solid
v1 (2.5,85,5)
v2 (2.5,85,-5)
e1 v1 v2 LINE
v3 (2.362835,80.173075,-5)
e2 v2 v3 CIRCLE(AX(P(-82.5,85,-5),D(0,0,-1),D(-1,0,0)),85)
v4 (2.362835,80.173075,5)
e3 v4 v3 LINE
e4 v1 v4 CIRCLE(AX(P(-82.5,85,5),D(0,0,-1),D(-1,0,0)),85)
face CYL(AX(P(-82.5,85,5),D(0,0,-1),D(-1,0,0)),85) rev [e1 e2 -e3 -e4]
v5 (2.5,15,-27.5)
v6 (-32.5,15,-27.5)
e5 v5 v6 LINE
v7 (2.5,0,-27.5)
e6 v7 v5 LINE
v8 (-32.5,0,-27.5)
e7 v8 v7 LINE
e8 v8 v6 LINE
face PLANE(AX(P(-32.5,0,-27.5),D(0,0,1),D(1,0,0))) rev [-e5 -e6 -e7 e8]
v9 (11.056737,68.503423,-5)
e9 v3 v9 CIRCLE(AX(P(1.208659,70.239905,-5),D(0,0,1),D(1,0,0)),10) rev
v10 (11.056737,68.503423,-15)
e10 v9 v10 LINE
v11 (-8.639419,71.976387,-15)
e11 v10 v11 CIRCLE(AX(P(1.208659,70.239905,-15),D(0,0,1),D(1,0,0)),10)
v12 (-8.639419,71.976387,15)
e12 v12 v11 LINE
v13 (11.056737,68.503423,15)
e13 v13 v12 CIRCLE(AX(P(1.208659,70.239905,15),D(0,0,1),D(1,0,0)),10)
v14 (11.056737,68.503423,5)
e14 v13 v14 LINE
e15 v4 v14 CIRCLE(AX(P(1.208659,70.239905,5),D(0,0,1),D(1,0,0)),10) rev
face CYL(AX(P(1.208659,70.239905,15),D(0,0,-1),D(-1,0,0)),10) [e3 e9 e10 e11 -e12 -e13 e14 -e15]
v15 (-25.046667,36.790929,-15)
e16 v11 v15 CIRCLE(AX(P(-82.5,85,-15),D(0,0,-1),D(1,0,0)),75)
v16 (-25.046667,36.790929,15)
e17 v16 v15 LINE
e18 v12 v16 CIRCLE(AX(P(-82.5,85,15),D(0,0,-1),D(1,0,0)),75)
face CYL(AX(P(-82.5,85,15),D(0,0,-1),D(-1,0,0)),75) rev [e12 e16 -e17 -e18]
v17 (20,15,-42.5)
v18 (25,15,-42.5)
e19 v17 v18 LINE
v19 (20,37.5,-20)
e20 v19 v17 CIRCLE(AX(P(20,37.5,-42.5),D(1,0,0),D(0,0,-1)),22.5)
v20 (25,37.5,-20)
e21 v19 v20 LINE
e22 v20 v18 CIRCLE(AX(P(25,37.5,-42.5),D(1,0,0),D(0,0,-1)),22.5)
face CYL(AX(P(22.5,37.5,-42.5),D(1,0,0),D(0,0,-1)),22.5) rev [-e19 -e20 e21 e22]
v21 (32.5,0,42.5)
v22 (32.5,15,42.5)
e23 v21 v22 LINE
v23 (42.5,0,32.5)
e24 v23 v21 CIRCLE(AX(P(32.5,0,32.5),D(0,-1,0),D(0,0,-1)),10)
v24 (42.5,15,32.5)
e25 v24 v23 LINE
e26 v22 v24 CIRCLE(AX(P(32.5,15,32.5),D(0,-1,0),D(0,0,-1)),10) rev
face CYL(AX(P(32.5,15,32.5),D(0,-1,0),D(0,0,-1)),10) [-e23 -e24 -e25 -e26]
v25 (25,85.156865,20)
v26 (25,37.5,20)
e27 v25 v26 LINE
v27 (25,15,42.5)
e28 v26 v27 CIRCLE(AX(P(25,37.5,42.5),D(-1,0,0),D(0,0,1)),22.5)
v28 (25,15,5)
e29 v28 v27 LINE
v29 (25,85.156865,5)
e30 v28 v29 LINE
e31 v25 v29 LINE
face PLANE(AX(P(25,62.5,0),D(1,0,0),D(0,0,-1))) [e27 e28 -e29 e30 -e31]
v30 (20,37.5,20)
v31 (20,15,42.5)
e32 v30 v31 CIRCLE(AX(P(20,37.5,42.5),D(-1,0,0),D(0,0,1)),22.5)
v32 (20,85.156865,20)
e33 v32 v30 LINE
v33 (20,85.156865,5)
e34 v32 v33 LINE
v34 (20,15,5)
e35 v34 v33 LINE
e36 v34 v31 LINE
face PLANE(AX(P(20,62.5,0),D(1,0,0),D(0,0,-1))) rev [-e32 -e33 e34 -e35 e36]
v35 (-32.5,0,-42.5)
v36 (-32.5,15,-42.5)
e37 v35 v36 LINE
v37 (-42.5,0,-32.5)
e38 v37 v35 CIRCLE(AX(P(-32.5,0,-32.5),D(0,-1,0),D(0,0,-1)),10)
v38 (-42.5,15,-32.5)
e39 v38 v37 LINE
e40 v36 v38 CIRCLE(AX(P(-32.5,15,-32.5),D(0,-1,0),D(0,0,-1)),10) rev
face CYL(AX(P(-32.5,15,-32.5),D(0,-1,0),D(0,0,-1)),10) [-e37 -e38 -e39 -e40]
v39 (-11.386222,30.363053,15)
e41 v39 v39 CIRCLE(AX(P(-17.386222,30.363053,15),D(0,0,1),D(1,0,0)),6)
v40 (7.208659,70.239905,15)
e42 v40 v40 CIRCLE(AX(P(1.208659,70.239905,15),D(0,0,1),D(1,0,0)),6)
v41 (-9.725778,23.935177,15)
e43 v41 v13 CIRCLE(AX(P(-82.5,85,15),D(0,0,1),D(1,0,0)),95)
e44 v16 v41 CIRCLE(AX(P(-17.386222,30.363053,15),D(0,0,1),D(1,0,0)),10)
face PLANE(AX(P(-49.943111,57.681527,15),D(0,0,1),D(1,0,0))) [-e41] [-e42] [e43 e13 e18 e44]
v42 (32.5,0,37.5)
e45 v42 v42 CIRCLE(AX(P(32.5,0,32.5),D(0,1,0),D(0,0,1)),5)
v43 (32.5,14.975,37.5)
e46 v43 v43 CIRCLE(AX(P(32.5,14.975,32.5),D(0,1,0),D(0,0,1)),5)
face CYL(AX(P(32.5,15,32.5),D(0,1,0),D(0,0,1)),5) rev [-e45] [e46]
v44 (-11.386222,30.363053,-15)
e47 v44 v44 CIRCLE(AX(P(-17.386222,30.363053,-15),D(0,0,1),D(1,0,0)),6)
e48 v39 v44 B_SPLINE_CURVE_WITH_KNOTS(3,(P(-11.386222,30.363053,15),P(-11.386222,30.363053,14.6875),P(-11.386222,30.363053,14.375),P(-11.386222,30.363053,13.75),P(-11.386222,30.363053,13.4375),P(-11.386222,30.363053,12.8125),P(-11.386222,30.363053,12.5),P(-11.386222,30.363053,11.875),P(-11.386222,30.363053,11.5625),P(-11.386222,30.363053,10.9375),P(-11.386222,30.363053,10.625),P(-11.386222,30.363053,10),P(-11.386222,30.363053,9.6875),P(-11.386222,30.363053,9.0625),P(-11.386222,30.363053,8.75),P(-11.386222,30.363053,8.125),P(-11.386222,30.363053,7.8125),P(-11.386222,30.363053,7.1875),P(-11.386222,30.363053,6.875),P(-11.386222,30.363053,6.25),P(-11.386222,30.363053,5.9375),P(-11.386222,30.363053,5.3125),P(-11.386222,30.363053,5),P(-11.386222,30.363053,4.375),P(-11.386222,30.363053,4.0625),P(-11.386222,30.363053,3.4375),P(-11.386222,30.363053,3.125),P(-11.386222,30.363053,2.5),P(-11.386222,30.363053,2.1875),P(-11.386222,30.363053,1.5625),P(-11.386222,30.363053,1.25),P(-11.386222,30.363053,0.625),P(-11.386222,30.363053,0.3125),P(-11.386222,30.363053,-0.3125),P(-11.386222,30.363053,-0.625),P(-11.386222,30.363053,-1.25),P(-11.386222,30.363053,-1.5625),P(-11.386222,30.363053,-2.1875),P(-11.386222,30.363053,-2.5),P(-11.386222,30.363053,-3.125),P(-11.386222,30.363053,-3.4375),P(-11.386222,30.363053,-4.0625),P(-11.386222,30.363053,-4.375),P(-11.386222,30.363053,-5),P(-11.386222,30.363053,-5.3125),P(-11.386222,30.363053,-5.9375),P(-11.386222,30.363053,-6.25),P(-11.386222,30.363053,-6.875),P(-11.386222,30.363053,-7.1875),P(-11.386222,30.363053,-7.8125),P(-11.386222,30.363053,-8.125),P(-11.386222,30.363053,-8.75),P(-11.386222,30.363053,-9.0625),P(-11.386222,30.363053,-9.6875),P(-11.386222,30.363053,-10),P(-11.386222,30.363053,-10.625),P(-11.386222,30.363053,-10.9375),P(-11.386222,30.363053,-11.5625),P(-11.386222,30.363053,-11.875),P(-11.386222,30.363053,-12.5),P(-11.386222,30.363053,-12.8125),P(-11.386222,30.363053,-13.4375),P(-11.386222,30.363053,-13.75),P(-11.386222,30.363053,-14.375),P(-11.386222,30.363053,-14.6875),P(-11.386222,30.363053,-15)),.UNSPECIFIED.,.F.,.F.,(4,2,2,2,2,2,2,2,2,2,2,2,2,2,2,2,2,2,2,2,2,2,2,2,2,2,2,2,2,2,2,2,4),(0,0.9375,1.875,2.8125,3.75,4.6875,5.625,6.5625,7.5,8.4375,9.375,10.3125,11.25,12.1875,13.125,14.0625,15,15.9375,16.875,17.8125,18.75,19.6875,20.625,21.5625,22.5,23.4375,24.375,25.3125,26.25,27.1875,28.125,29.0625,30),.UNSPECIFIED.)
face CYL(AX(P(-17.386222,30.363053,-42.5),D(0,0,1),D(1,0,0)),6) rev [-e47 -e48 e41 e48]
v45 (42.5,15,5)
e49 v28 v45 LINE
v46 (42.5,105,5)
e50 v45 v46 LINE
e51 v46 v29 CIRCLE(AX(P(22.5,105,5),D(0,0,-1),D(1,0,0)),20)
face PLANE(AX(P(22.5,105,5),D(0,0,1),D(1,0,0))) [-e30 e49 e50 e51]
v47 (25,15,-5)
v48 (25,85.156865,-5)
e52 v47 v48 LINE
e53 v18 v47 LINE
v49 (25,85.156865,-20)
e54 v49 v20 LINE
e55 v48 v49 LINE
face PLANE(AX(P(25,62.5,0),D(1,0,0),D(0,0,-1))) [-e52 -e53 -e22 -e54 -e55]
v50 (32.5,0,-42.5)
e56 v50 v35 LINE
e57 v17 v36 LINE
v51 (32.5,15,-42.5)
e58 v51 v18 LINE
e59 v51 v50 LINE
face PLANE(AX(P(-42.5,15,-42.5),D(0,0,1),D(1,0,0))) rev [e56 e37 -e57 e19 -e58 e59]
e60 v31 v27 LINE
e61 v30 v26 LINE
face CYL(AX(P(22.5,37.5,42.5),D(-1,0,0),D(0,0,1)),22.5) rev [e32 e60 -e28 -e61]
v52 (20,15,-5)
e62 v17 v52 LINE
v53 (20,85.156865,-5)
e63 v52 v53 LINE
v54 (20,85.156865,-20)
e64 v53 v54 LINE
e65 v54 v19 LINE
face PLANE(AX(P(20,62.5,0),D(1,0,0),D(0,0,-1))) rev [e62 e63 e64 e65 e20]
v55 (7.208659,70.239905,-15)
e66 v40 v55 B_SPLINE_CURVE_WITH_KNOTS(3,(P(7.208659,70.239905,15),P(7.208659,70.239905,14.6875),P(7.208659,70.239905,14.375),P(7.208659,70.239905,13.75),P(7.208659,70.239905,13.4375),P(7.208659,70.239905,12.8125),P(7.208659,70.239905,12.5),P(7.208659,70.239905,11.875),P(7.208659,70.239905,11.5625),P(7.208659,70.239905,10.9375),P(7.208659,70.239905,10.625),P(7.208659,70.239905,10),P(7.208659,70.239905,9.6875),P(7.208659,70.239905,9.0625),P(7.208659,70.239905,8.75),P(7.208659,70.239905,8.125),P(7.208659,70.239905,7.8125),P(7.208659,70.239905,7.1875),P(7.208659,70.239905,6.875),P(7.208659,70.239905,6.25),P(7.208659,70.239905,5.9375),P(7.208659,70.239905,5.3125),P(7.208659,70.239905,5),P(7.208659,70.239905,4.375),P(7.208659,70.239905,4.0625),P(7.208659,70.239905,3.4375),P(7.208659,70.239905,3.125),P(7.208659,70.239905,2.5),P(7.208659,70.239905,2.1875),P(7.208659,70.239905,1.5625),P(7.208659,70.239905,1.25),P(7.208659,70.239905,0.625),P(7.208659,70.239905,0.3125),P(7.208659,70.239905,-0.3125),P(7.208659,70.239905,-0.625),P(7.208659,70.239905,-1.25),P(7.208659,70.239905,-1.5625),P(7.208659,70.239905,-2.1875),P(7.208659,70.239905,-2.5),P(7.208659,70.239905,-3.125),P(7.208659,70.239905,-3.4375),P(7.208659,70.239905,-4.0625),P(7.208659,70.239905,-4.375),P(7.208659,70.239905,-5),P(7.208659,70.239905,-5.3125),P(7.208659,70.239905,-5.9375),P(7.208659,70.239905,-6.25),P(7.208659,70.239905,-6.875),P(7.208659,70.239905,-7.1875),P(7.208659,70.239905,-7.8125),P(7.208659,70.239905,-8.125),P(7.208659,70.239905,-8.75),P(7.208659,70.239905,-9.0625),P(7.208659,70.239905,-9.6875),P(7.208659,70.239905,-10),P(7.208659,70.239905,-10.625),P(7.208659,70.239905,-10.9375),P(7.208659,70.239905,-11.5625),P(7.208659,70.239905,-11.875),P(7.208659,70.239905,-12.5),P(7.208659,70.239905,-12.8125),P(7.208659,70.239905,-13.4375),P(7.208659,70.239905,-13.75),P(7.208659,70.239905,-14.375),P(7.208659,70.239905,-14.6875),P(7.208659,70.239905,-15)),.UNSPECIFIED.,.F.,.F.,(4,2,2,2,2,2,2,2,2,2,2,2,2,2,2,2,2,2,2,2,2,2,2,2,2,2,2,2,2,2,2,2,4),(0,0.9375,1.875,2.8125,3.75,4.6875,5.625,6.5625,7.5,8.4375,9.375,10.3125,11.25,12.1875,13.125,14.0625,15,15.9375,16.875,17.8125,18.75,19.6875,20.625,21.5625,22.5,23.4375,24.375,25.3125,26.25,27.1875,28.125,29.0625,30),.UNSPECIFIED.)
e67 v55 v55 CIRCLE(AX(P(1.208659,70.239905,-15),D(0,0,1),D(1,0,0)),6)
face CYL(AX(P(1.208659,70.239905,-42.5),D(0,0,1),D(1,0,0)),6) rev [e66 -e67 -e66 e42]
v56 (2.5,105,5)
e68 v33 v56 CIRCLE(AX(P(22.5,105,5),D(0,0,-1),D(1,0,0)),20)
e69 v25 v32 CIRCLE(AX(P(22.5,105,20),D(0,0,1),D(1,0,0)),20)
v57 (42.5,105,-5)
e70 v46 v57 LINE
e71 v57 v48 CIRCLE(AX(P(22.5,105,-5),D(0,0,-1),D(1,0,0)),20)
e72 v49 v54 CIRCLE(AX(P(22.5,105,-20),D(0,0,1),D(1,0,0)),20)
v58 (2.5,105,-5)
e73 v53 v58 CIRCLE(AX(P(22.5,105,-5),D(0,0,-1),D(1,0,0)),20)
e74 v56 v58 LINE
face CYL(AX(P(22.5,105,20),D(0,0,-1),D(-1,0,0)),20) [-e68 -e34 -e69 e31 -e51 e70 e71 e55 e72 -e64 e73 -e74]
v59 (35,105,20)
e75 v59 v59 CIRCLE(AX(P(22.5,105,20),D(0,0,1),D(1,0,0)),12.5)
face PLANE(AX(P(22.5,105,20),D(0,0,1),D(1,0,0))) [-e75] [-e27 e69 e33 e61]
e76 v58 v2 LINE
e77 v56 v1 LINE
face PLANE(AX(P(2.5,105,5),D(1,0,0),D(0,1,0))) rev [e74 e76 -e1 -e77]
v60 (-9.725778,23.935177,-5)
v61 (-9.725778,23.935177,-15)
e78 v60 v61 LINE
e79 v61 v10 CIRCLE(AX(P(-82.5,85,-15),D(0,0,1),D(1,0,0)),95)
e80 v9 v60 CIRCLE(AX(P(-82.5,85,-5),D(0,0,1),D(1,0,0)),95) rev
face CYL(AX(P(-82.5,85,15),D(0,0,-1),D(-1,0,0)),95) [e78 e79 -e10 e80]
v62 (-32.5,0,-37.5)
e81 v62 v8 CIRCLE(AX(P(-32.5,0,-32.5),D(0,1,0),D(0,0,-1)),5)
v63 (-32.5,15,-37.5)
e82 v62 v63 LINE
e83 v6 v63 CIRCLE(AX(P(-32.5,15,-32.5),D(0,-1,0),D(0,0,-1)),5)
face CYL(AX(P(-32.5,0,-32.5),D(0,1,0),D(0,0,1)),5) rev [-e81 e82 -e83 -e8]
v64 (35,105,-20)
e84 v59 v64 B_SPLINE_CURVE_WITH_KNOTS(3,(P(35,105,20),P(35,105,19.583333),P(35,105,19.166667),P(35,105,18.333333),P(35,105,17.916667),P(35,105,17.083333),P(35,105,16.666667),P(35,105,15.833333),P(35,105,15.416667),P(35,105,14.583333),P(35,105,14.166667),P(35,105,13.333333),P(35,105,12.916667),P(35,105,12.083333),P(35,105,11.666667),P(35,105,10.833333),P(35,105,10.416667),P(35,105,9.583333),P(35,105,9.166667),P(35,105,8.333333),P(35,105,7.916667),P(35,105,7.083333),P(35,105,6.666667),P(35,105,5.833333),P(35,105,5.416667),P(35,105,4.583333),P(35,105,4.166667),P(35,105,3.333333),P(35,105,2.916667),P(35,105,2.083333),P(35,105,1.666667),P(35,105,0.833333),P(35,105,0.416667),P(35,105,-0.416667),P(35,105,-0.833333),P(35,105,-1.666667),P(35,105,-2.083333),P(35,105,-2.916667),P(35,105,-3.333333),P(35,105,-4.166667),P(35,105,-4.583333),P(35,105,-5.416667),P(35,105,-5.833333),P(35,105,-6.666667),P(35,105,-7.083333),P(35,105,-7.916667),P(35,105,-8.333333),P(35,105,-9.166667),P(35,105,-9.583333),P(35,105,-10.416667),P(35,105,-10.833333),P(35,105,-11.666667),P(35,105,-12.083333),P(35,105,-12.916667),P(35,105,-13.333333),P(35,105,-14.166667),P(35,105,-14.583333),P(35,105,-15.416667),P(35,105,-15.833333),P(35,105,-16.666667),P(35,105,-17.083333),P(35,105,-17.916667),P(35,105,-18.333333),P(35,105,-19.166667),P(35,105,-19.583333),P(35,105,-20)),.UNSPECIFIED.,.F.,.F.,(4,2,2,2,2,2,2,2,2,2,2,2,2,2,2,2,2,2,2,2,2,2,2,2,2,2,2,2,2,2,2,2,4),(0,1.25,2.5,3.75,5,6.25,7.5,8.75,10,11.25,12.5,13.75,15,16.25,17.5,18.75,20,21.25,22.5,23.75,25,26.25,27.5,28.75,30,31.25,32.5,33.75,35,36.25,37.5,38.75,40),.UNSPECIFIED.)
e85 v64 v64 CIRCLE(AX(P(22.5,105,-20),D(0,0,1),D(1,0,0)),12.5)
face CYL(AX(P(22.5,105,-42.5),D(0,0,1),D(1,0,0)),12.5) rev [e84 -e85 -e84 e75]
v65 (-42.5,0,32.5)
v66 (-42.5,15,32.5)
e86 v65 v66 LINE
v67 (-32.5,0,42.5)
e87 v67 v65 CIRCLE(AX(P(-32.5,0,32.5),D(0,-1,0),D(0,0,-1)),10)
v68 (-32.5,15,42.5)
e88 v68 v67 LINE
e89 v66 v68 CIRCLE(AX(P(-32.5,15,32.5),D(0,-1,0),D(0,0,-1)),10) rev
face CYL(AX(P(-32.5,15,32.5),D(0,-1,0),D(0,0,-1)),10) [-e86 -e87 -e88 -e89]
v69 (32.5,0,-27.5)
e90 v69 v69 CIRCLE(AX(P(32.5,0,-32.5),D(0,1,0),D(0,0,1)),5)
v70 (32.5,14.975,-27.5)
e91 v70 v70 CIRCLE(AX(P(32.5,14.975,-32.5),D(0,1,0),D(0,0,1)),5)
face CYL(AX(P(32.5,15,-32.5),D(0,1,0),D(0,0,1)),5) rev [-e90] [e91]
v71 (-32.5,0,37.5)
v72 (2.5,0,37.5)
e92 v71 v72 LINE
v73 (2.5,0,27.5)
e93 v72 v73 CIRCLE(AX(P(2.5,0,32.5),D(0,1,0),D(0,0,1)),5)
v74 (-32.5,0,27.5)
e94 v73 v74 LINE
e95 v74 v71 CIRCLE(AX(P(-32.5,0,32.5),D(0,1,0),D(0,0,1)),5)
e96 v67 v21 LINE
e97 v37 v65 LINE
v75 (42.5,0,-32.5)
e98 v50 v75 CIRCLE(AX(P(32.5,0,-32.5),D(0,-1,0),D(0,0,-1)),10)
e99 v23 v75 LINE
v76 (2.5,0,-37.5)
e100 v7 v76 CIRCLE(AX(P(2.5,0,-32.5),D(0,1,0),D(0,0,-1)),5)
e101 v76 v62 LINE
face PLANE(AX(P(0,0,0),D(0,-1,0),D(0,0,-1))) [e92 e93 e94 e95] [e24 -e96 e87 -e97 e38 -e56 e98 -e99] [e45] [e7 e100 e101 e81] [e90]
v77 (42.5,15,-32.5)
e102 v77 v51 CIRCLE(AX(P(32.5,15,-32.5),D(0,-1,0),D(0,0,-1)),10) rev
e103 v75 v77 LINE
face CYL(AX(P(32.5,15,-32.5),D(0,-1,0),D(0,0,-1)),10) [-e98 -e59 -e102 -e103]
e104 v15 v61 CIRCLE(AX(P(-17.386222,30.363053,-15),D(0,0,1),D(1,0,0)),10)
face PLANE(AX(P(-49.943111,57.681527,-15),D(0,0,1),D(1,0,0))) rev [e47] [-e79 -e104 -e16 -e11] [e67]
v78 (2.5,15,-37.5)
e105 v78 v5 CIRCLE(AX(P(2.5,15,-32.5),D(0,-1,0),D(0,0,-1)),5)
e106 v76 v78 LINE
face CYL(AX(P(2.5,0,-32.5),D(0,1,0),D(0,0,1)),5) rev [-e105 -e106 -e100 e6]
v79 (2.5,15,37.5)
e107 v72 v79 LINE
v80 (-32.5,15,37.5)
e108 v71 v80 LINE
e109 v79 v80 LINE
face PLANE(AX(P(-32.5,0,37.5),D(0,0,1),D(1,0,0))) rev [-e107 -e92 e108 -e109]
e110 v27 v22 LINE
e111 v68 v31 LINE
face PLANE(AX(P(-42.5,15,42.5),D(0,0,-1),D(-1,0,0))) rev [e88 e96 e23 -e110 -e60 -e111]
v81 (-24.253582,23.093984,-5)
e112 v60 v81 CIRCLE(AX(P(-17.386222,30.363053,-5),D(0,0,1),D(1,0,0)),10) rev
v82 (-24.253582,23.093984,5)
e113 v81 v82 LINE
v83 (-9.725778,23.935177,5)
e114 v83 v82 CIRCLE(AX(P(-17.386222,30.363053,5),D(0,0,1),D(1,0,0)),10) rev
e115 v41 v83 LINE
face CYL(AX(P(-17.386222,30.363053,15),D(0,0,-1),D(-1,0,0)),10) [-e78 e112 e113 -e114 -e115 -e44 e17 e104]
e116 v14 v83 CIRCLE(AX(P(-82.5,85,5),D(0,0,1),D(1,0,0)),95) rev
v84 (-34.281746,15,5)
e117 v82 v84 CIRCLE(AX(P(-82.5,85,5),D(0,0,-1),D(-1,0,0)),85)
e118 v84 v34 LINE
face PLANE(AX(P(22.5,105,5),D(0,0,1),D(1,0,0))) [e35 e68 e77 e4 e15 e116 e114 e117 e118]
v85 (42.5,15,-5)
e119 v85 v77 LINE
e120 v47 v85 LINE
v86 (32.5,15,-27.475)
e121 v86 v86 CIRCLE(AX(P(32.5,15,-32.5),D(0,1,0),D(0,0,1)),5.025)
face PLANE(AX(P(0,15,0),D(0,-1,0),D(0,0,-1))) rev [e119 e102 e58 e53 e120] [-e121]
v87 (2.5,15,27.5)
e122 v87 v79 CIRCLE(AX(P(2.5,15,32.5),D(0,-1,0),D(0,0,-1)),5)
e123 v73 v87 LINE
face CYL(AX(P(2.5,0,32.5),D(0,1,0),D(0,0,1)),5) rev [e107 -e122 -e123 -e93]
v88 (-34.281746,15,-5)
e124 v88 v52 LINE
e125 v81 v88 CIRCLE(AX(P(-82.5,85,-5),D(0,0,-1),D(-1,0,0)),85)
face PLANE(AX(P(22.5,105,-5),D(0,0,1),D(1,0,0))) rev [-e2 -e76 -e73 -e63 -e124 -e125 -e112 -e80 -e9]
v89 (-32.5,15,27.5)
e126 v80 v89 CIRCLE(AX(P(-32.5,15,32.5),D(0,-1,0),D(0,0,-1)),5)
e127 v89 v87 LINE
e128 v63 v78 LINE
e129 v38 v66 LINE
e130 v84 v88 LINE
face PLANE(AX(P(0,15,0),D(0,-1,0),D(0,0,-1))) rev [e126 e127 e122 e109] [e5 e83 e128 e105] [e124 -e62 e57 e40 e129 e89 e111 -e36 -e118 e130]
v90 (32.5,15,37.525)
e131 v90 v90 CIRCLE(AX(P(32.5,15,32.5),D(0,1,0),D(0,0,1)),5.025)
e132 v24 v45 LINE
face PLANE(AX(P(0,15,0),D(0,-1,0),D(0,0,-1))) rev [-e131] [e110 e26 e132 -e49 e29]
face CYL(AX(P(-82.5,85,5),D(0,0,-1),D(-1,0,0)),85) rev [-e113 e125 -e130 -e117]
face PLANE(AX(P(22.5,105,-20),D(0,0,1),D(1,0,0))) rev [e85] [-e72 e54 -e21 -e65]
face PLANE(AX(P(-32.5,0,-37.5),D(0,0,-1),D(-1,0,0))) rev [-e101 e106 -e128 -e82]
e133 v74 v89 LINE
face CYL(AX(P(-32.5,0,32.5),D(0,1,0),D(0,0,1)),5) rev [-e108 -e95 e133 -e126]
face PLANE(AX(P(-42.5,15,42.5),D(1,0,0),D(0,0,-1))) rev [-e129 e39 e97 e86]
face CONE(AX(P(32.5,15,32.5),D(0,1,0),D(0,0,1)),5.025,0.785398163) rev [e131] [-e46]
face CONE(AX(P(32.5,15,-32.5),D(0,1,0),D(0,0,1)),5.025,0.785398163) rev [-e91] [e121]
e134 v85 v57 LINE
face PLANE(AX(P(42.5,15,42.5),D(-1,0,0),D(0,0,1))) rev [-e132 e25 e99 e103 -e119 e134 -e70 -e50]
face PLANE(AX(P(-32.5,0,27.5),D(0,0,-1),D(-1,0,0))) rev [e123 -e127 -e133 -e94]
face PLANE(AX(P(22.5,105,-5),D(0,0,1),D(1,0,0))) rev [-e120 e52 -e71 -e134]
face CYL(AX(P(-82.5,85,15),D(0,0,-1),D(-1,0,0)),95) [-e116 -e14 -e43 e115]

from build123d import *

# Parameters (mm, degrees)
SKETCH1_W                            = 85
SKETCH1_H                            = 85
BOSS_EXTRUDE1_DEPTH                  = 15
SKETCH2_R                            = 20
BOSS_EXTRUDE2_DEPTH                  = 20
BOSS_EXTRUDE3_DEPTH                  = 5
BOSS_EXTRUDE4_DEPTH                  = 15
RIB1_START                           = -2.5
RIB1_DEPTH                           = 5
FILLET1_R                            = 10
F_10_0_10_DIAMETER_HOLE1_D           = 10
F_10_0_10_DIAMETER_HOLE1_CSINK_D     = 10.05
F_10_0_10_DIAMETER_HOLE1_CSINK_ANGLE = 90
CUT_EXTRUDE1_DEPTH                   = 126.349511367
CUT_EXTRUDE1_DEPTH_BACK              = 126.349511367
CUT_EXTRUDE2_DEPTH                   = 145.005208239
CUT_EXTRUDE2_DEPTH_BACK              = 145.005208239
SKETCH9_R                            = 12.5
SKETCH9_R_2                          = 6


with BuildPart() as part:
    # Sketch1 → Boss-Extrude1 (new body)
    with BuildSketch(Plane(origin=(0, 0, 0), x_dir=(1, 0, 0), z_dir=(0, 1, 0))):
        Rectangle(SKETCH1_W, SKETCH1_H)
    extrude(amount=BOSS_EXTRUDE1_DEPTH)



with BuildPart() as body_2:
    # Sketch2 → Boss-Extrude2 (new, symmetric)
    with BuildSketch(Plane.XY):
        with Locations((22.5, 105)):
            Circle(SKETCH2_R)
    extrude(amount=BOSS_EXTRUDE2_DEPTH, both=True)


with BuildPart() as part_1:
    add(part.part)

    add(body_2.part)  # Boss-Extrude3 merges body 2
    # Sketch4 → Boss-Extrude3 (add, symmetric)
    with BuildSketch(Plane.XY):
        with BuildLine():
            Line((42.5, 105), (42.5, 15))
            Line((42.5, 15), (-34.281746195, 15))
            ThreePointArc((-34.281746195, 15), (-7.255227512, 45.462369655), (2.5, 85))
            Line((2.5, 85), (2.5, 105))
            ThreePointArc((2.5, 105), (22.5, 85), (42.5, 105))
        make_face()
    extrude(amount=BOSS_EXTRUDE3_DEPTH, both=True)

    # Sketch5 → Boss-Extrude4 (add, symmetric)
    with BuildSketch(Plane.XY):
        with BuildLine():
            ThreePointArc((-9.725777904, 23.93517708), (3.599239768, 44.851265135), (11.056736536, 68.503423122))
            ThreePointArc((11.056736536, 68.503423122), (2.945140783, 80.087982428), (-8.639418524, 71.976386675))
            ThreePointArc((-8.639418524, 71.976386675), (-14.526915972, 53.303630369), (-25.046666766, 36.790929274))
            ThreePointArc((-25.046666766, 36.790929274), (-23.814098432, 22.702608745), (-9.725777904, 23.93517708))
        make_face()
    extrude(amount=BOSS_EXTRUDE4_DEPTH, both=True)

    # Rib1: read off the stored shape, not the designer's step
    # Rib1 outline → Rib1 (add)
    with BuildSketch(Plane(origin=(22.5, 0, 0), x_dir=(0, 0, -1), z_dir=(1, 0, 0)).offset(RIB1_START)):
        with BuildLine():
            Line((-5, 15), (-5, 85.156865167))
            Line((-5, 85.156865167), (-20, 85.156865167))
            Line((-20, 85.156865167), (-20, 37.5))
            ThreePointArc((-20, 37.5), (-26.590097423, 21.590097423), (-42.5, 15))
            Line((-42.5, 15), (-5, 15))
        make_face()
    rib1 = extrude(amount=RIB1_DEPTH)

    # Mirror1: Rib1 across plane
    add(rib1.mirror(Plane.XY))

    # Fillet1
    fillet1_edges = [part_1.edges().sort_by_distance(p)[0] for p in [
        (42.5, 7.5, 42.5),
        (-42.5, 7.5, 42.5),
        (-42.5, 7.5, -42.5),
        (42.5, 7.5, -42.5),
    ]]
    fillet(fillet1_edges, radius=FILLET1_R)

    # Ø10.0 (10) Diameter Hole1 (through all)
    with Locations(Plane(origin=(32.5, 15, -32.5), x_dir=(0, 0, 1), z_dir=(0, 1, 0))):
        with Locations((0, 0), (65, 0)):
            CounterSinkHole(F_10_0_10_DIAMETER_HOLE1_D / 2, F_10_0_10_DIAMETER_HOLE1_CSINK_D / 2, counter_sink_angle=F_10_0_10_DIAMETER_HOLE1_CSINK_ANGLE)

    # Sketch8 → Cut-Extrude1 (cut, two sides: drawn at the far end of the back side and taken through both)
    with BuildSketch(Plane(origin=(0, 15, 0), x_dir=(1, 0, 0), z_dir=(0, 1, 0)).offset(-CUT_EXTRUDE1_DEPTH_BACK)):
        with BuildLine():
            Line((-32.5, -27.5), (2.5, -27.5))
            ThreePointArc((2.5, -27.5), (7.5, -32.5), (2.5, -37.5))
            Line((2.5, -37.5), (-32.5, -37.5))
            ThreePointArc((-32.5, -37.5), (-37.5, -32.5), (-32.5, -27.5))
        make_face()
        with BuildLine():
            Line((-32.5, 27.5), (2.5, 27.5))
            ThreePointArc((2.5, 27.5), (7.5, 32.5), (2.5, 37.5))
            Line((2.5, 37.5), (-32.5, 37.5))
            ThreePointArc((-32.5, 37.5), (-37.5, 32.5), (-32.5, 27.5))
        make_face()
    extrude(amount=CUT_EXTRUDE1_DEPTH + CUT_EXTRUDE1_DEPTH_BACK, mode=Mode.SUBTRACT)

    # Sketch9 → Cut-Extrude2 (cut, two sides: drawn at the far end of the back side and taken through both)
    with BuildSketch(Plane.XY.offset(15).offset(-CUT_EXTRUDE2_DEPTH_BACK)):
        with Locations((22.5, 105)):
            Circle(SKETCH9_R)
        with Locations((1.208659006, 70.239904898)):
            Circle(SKETCH9_R_2)
        with Locations((-17.386222335, 30.363053177)):
            Circle(SKETCH9_R_2)
    extrude(amount=CUT_EXTRUDE2_DEPTH + CUT_EXTRUDE2_DEPTH_BACK, mode=Mode.SUBTRACT)


solid = part_1.part
